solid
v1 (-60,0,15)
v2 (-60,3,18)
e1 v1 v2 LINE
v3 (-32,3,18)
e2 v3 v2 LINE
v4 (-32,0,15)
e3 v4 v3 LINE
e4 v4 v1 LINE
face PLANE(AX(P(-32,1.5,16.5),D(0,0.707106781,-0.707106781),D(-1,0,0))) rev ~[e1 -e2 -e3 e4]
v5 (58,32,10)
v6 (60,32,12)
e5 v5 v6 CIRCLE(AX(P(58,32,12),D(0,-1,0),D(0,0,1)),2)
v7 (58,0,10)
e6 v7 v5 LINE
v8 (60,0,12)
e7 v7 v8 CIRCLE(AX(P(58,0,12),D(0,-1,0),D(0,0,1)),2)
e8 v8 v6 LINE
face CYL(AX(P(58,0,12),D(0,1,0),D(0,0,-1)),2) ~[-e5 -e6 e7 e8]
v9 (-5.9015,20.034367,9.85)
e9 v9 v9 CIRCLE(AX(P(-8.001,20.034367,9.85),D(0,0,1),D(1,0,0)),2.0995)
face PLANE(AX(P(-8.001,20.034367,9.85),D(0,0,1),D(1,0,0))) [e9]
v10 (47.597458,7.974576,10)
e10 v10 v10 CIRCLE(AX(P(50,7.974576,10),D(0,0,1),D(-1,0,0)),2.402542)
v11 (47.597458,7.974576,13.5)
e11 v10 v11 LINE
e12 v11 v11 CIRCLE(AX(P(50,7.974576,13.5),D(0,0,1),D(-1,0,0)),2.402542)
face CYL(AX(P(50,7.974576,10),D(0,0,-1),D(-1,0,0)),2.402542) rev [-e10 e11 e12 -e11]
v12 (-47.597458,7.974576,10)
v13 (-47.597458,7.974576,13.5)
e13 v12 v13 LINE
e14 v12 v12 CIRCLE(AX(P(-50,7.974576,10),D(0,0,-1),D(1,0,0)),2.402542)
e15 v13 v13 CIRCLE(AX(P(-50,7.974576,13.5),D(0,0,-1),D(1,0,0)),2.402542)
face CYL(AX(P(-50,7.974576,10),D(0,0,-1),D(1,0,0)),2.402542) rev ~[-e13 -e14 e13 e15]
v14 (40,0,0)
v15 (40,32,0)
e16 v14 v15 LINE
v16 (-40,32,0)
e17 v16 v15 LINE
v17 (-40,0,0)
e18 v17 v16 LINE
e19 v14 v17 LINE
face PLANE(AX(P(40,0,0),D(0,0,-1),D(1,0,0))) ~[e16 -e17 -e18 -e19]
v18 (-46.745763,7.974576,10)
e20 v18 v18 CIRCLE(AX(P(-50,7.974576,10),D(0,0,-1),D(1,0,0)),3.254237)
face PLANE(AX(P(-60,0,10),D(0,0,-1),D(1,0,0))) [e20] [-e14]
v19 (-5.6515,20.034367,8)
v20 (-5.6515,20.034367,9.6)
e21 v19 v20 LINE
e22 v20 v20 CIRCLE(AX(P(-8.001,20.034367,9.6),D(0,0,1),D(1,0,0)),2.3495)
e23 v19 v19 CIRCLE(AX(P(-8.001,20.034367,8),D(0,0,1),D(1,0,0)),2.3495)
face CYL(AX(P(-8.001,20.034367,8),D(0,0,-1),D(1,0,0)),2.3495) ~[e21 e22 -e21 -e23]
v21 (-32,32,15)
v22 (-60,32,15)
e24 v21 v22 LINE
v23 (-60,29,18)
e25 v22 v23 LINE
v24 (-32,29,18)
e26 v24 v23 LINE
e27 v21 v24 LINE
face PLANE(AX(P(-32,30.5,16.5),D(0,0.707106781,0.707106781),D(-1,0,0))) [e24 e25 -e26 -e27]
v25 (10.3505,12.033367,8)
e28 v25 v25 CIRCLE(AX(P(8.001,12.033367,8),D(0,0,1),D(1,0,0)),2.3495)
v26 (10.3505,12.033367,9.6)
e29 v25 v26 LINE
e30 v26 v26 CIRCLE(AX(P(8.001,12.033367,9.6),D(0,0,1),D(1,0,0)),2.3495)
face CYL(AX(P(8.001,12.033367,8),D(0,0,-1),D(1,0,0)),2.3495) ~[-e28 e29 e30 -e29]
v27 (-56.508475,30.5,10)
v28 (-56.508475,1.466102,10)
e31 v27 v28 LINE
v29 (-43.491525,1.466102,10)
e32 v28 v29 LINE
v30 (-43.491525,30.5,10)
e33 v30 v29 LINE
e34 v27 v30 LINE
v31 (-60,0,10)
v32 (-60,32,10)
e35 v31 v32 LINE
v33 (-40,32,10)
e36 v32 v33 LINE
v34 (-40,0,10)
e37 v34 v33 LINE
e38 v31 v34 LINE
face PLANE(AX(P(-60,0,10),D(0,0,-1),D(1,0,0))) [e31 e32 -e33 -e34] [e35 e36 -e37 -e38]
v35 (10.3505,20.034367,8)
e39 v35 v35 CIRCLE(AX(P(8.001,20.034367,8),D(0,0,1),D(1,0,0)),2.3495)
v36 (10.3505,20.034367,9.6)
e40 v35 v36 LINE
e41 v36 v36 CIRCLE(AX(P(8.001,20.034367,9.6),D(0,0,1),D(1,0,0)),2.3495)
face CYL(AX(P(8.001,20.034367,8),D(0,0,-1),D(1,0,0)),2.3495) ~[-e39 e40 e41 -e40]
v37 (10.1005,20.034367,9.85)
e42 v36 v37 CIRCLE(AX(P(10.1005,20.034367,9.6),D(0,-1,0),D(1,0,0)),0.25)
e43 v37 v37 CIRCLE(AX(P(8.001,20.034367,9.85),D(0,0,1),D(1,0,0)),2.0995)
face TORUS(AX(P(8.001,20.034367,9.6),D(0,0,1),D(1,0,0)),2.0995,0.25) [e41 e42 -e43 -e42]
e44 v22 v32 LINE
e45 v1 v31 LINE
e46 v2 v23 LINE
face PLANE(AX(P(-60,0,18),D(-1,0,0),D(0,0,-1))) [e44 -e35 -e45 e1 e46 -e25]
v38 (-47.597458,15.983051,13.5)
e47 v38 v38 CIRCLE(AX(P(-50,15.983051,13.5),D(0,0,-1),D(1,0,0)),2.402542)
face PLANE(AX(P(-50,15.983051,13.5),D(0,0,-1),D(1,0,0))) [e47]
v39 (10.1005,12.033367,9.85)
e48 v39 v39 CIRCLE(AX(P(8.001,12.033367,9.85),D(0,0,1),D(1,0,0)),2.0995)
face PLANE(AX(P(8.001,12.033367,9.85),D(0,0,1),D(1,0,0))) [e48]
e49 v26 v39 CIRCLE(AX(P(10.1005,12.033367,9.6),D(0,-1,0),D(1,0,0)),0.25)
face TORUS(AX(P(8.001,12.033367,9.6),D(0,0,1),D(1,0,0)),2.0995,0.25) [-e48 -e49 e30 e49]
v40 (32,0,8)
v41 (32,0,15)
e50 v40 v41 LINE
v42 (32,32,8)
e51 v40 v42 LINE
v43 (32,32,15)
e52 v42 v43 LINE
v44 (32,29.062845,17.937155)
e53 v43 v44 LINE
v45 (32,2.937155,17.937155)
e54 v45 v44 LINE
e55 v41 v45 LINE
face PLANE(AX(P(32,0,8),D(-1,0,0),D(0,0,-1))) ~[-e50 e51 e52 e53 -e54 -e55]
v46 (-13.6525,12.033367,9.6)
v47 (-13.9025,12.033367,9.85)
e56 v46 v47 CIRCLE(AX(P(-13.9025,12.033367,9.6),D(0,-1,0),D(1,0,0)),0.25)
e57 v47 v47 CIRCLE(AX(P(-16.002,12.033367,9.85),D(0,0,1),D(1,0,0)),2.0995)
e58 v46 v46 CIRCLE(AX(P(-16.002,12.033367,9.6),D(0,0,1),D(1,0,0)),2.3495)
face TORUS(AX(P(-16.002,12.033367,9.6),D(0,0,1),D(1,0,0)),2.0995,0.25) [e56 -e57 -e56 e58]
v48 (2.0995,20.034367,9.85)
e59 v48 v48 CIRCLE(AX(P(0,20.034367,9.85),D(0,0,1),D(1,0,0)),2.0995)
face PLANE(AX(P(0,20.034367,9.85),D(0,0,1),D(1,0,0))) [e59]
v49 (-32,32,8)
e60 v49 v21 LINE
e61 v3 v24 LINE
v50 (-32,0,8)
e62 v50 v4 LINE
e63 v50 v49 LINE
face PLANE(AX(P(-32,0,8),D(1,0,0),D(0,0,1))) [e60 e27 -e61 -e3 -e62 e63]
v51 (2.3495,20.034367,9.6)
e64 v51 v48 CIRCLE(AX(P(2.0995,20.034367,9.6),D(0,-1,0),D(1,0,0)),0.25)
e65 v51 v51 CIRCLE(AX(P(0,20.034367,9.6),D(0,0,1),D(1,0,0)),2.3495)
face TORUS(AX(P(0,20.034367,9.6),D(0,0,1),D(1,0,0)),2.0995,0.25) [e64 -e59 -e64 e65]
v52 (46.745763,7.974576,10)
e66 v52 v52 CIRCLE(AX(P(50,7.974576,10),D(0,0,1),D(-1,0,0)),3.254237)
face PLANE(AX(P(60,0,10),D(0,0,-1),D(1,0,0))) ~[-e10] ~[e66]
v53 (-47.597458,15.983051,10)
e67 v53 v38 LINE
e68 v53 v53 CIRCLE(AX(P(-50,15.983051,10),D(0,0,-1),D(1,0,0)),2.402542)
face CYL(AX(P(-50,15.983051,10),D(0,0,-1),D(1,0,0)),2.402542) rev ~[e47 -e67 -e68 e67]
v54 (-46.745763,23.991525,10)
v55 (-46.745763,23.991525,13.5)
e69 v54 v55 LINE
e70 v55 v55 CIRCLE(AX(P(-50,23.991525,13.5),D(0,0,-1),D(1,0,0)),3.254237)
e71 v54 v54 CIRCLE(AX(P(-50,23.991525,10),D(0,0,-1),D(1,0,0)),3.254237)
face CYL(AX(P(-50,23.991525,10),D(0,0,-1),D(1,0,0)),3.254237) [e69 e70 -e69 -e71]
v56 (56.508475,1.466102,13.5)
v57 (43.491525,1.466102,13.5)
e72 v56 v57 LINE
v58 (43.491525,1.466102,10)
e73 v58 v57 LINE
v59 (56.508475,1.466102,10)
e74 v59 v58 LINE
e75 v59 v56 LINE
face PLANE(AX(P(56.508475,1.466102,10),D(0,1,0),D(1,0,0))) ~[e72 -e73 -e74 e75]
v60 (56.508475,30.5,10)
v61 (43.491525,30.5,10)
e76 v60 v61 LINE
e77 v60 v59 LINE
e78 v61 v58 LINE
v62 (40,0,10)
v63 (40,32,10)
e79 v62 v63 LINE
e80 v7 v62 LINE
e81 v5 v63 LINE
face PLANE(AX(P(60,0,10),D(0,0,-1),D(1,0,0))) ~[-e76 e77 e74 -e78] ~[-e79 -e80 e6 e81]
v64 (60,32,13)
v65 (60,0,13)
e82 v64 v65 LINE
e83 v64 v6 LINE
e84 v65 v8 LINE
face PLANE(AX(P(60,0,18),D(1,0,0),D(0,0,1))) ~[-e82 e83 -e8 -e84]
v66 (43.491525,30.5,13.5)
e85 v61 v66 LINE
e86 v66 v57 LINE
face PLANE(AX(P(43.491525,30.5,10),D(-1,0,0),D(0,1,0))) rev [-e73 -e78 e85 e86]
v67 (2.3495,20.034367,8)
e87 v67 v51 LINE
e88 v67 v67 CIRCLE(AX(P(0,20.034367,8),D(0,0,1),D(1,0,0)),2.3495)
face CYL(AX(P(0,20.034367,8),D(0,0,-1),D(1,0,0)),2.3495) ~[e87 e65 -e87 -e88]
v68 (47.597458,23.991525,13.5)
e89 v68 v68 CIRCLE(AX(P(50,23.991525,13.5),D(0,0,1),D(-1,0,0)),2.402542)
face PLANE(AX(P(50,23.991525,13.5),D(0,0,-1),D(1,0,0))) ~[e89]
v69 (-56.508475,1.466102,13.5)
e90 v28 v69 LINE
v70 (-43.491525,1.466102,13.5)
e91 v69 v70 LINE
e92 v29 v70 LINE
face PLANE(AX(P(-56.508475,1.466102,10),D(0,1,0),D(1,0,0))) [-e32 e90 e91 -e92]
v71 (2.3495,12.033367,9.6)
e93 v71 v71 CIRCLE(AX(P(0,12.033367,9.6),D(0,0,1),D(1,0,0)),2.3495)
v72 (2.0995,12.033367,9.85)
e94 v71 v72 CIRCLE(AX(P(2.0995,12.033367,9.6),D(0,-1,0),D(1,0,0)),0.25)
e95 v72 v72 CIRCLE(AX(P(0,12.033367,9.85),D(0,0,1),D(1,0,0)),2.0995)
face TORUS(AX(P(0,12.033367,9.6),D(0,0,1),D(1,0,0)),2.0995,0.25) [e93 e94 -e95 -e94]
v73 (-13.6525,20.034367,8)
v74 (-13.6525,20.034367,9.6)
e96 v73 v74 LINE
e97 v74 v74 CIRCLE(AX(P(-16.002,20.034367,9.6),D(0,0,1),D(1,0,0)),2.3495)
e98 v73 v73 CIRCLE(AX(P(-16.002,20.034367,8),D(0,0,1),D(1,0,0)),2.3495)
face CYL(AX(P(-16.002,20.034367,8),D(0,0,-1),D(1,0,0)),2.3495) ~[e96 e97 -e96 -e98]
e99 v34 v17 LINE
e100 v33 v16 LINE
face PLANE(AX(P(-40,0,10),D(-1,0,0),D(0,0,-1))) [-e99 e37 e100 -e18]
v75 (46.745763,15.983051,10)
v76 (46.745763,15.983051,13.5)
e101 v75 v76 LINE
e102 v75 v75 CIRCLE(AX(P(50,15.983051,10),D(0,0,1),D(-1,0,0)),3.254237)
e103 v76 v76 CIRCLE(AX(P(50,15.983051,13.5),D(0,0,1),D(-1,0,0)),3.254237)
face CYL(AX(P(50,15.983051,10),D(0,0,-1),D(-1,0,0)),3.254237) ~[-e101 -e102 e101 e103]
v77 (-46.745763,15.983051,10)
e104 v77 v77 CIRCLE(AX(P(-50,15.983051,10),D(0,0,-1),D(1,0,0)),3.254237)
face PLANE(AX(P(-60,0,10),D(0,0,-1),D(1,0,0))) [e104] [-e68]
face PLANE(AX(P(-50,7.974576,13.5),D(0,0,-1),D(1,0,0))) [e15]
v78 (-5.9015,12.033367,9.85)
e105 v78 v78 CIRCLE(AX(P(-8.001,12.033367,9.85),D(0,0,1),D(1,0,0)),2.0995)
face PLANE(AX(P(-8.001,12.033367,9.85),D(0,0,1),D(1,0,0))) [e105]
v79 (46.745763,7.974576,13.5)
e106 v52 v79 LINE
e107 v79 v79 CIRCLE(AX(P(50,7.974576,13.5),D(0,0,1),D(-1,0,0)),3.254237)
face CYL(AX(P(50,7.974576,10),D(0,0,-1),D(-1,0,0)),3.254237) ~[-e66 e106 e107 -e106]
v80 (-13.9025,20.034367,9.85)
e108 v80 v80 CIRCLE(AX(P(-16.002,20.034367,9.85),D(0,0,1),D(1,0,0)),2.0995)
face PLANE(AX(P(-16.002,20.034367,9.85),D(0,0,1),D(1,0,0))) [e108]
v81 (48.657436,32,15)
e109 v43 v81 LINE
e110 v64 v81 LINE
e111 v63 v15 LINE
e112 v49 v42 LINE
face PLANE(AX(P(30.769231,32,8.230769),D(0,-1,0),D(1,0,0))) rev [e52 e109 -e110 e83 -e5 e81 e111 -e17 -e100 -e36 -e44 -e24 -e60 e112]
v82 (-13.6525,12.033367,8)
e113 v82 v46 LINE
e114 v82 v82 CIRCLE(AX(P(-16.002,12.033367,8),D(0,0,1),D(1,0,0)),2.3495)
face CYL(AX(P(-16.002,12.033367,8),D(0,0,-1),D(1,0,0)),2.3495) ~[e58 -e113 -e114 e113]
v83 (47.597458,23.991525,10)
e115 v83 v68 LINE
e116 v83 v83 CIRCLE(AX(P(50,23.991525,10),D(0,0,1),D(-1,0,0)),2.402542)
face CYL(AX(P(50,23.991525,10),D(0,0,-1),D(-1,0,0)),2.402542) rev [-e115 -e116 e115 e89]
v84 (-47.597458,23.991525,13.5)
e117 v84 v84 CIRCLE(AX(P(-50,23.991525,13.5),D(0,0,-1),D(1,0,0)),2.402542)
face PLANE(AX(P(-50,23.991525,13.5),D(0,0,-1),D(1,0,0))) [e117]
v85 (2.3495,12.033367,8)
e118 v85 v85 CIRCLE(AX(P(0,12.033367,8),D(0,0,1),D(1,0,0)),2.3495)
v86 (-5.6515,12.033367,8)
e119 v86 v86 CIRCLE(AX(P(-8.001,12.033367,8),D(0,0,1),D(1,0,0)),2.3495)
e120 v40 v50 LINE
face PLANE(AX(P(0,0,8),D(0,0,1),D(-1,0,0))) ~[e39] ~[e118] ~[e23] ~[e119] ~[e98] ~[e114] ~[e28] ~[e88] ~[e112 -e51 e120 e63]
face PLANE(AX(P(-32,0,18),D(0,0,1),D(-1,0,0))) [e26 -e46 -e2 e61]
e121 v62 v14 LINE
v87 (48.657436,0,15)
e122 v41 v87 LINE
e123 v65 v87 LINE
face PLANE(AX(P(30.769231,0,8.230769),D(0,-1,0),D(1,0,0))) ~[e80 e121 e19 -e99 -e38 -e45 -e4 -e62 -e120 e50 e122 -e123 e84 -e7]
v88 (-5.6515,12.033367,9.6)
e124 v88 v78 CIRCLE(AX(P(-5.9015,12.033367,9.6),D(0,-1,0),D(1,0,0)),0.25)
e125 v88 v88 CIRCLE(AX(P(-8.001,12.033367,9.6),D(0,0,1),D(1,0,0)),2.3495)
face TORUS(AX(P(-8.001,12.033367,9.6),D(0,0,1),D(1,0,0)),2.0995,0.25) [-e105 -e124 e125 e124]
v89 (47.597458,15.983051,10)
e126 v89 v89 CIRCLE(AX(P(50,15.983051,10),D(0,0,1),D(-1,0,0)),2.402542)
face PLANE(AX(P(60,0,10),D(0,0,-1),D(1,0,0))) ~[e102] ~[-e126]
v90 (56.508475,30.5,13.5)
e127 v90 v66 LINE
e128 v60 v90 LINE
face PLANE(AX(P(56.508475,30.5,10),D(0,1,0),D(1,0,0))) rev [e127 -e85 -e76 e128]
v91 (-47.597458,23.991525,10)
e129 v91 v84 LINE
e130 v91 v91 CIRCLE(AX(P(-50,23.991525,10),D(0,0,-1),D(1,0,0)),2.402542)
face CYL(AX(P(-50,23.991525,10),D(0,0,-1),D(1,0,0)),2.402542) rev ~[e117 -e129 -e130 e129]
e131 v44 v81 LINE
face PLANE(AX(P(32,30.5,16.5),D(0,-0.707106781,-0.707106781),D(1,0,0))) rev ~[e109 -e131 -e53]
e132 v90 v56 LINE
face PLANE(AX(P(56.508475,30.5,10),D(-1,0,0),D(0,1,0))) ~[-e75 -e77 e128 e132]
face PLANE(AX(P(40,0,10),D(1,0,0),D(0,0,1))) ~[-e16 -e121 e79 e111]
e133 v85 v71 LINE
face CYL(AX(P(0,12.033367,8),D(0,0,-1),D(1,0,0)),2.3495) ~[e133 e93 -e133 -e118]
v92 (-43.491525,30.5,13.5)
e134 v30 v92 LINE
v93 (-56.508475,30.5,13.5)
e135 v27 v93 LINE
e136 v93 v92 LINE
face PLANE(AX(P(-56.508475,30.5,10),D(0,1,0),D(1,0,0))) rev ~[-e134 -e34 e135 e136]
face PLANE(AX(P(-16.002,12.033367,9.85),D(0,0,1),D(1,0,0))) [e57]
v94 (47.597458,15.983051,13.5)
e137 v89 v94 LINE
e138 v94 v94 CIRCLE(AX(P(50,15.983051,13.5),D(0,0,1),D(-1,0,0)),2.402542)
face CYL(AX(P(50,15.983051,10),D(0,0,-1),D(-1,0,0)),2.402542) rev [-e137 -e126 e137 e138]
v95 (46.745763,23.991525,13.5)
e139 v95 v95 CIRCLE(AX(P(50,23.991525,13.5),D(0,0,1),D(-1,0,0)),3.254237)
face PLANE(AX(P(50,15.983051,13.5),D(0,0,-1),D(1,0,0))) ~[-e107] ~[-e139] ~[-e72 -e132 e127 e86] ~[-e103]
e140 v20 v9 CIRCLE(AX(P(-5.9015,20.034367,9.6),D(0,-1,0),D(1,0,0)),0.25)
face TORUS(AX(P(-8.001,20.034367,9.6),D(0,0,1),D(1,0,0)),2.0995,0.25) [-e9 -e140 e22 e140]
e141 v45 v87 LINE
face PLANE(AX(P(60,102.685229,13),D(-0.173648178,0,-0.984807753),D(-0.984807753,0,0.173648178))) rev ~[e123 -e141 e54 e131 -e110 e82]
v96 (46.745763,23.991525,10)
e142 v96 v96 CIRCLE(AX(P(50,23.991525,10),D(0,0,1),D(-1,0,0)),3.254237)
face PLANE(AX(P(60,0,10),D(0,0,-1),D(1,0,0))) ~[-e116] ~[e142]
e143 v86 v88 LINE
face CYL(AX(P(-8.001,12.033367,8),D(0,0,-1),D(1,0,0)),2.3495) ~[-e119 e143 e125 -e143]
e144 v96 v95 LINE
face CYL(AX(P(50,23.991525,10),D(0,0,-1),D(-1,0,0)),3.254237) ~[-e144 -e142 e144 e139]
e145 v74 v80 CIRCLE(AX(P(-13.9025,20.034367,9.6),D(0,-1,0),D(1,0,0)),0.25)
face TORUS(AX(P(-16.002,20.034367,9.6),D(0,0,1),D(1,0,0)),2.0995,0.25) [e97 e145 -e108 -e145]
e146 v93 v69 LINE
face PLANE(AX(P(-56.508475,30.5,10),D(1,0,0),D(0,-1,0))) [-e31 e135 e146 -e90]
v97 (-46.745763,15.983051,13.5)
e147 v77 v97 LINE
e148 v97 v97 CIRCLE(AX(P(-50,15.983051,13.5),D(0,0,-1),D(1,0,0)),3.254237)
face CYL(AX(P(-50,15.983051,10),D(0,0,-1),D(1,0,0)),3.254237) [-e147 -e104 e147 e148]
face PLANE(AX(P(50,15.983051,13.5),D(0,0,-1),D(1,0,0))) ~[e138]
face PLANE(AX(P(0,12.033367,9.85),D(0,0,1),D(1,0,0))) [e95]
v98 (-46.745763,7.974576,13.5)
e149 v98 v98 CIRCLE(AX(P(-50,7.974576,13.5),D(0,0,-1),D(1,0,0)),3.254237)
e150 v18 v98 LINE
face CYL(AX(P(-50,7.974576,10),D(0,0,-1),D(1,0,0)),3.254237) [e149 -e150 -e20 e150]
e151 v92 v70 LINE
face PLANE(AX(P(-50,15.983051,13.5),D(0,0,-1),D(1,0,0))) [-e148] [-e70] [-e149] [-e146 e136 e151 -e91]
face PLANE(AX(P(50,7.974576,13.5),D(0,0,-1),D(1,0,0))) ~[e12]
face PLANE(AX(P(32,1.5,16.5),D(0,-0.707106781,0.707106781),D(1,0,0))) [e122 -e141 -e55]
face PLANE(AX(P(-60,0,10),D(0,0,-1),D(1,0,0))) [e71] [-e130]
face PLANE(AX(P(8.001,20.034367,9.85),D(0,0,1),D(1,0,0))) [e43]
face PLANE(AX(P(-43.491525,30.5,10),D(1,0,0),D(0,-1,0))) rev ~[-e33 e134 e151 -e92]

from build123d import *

# Parameters (mm, degrees)
F1_DEPTH    = 32
F2_W        = 13.0169491525
F2_H        = 29.0338983051
F2_R        = 3.2542372881
F2_R_2      = 2.4025423729
F3_DEPTH    = 3.5
F5_R        = 2.3495
F6_DEPTH    = 1.85
F7_SIZE     = 3
F8_R        = 2
F9_T1_DEPTH = 173.3704583371
F10_R       = 0.25


# Not quite as in the source:
# - a fillet or chamfer that OpenCascade refuses, or shapes differently, is made with other operations: its cross-section is extruded or revolved along the edge and cut away or added


with BuildPart() as f1:
    # F0 (on Front) → F1 (new body)
    with BuildSketch(Plane.XZ):
        Polygon((-40, 0), (0, 0), (0, 8), (-32, 8), (-32, 18), (-60, 18), (-60, 10), (-40, 10), align=None)
    extrude(amount=-F1_DEPTH)

    # F2 (on face) → F3 (cut)
    with BuildSketch(Plane(origin=(0, 0, 10), x_dir=(1, 0, 0), z_dir=(0, 0, -1))):
        with Locations((-50, -15.9830508475)):
            Rectangle(F2_W, F2_H)
        with Locations((-50, -23.9915254237)):
            Circle(F2_R, mode=Mode.SUBTRACT)
        with Locations((-50, -15.9830508475)):
            Circle(F2_R, mode=Mode.SUBTRACT)
        with Locations((-50, -7.9745762712)):
            Circle(F2_R, mode=Mode.SUBTRACT)
        with Locations((-50, -15.9830508475)):
            Circle(F2_R_2)
        with Locations((-50, -7.9745762712)):
            Circle(F2_R_2)
        with Locations((-50, -23.9915254237)):
            Circle(F2_R_2)
    extrude(amount=-F3_DEPTH, mode=Mode.SUBTRACT)

    # F4: F1 across face


with BuildPart() as f1_1:
    add(f1.part)
    add(f1.part.mirror(Plane(origin=(0, 16, 4), x_dir=(0, 1, 0), z_dir=(1, 0, 0))))

    # F5 (on face) → F6 (join)
    with BuildSketch(Plane.XY.offset(8)):
        with Locations((-16.002, 12.0333669113)):
            Circle(F5_R)
        with Locations((-16.002, 20.0343669113)):
            Circle(F5_R)
        with Locations((-8.001, 20.0343669113)):
            Circle(F5_R)
        with Locations((-8.001, 12.0333669113)):
            Circle(F5_R)
        with Locations((0, 12.0333669113)):
            Circle(F5_R)
        with Locations((0, 20.0343669113)):
            Circle(F5_R)
        with Locations((8.001, 20.0343669113)):
            Circle(F5_R)
        with Locations((8.001, 12.0333669113)):
            Circle(F5_R)
    extrude(amount=F6_DEPTH)

    # F7
    f7_edges = [f1_1.edges().sort_by_distance(p)[0] for p in [
        (-46, 0, 18),
        (-46, 32, 18),
        (46, 0, 18),
        (46, 32, 18),
    ]]
    chamfer(f7_edges, length=F7_SIZE)

    # F8
    f8_edges = [f1_1.edges().sort_by_distance(p)[0] for p in [
        (60, 16, 10),
    ]]
    fillet(f8_edges, radius=F8_R)

    # F9: chamfer of 5 x 28.3564090981 on 1 edges, made by hand

    # F9_s2 → F9_t1 (cut)
    with BuildSketch(Plane.XZ.offset(-102.6852291686)):
        Polygon((60, 13), (31.6435909019, 18), (60, 18), align=None)
    extrude(amount=F9_T1_DEPTH, mode=Mode.SUBTRACT)

    # F10
    f10_edges = [f1_1.edges().sort_by_distance(p)[0] for p in [
        (-18.3515, 12.033367, 9.85),
        (-18.3515, 20.034367, 9.85),
        (-10.3505, 20.034367, 9.85),
        (-10.3505, 12.033367, 9.85),
        (-2.3495, 12.033367, 9.85),
        (5.6515, 12.033367, 9.85),
        (5.6515, 20.034367, 9.85),
        (-2.3495, 20.034367, 9.85),
    ]]
    fillet(f10_edges, radius=F10_R)


solid = f1_1.part
